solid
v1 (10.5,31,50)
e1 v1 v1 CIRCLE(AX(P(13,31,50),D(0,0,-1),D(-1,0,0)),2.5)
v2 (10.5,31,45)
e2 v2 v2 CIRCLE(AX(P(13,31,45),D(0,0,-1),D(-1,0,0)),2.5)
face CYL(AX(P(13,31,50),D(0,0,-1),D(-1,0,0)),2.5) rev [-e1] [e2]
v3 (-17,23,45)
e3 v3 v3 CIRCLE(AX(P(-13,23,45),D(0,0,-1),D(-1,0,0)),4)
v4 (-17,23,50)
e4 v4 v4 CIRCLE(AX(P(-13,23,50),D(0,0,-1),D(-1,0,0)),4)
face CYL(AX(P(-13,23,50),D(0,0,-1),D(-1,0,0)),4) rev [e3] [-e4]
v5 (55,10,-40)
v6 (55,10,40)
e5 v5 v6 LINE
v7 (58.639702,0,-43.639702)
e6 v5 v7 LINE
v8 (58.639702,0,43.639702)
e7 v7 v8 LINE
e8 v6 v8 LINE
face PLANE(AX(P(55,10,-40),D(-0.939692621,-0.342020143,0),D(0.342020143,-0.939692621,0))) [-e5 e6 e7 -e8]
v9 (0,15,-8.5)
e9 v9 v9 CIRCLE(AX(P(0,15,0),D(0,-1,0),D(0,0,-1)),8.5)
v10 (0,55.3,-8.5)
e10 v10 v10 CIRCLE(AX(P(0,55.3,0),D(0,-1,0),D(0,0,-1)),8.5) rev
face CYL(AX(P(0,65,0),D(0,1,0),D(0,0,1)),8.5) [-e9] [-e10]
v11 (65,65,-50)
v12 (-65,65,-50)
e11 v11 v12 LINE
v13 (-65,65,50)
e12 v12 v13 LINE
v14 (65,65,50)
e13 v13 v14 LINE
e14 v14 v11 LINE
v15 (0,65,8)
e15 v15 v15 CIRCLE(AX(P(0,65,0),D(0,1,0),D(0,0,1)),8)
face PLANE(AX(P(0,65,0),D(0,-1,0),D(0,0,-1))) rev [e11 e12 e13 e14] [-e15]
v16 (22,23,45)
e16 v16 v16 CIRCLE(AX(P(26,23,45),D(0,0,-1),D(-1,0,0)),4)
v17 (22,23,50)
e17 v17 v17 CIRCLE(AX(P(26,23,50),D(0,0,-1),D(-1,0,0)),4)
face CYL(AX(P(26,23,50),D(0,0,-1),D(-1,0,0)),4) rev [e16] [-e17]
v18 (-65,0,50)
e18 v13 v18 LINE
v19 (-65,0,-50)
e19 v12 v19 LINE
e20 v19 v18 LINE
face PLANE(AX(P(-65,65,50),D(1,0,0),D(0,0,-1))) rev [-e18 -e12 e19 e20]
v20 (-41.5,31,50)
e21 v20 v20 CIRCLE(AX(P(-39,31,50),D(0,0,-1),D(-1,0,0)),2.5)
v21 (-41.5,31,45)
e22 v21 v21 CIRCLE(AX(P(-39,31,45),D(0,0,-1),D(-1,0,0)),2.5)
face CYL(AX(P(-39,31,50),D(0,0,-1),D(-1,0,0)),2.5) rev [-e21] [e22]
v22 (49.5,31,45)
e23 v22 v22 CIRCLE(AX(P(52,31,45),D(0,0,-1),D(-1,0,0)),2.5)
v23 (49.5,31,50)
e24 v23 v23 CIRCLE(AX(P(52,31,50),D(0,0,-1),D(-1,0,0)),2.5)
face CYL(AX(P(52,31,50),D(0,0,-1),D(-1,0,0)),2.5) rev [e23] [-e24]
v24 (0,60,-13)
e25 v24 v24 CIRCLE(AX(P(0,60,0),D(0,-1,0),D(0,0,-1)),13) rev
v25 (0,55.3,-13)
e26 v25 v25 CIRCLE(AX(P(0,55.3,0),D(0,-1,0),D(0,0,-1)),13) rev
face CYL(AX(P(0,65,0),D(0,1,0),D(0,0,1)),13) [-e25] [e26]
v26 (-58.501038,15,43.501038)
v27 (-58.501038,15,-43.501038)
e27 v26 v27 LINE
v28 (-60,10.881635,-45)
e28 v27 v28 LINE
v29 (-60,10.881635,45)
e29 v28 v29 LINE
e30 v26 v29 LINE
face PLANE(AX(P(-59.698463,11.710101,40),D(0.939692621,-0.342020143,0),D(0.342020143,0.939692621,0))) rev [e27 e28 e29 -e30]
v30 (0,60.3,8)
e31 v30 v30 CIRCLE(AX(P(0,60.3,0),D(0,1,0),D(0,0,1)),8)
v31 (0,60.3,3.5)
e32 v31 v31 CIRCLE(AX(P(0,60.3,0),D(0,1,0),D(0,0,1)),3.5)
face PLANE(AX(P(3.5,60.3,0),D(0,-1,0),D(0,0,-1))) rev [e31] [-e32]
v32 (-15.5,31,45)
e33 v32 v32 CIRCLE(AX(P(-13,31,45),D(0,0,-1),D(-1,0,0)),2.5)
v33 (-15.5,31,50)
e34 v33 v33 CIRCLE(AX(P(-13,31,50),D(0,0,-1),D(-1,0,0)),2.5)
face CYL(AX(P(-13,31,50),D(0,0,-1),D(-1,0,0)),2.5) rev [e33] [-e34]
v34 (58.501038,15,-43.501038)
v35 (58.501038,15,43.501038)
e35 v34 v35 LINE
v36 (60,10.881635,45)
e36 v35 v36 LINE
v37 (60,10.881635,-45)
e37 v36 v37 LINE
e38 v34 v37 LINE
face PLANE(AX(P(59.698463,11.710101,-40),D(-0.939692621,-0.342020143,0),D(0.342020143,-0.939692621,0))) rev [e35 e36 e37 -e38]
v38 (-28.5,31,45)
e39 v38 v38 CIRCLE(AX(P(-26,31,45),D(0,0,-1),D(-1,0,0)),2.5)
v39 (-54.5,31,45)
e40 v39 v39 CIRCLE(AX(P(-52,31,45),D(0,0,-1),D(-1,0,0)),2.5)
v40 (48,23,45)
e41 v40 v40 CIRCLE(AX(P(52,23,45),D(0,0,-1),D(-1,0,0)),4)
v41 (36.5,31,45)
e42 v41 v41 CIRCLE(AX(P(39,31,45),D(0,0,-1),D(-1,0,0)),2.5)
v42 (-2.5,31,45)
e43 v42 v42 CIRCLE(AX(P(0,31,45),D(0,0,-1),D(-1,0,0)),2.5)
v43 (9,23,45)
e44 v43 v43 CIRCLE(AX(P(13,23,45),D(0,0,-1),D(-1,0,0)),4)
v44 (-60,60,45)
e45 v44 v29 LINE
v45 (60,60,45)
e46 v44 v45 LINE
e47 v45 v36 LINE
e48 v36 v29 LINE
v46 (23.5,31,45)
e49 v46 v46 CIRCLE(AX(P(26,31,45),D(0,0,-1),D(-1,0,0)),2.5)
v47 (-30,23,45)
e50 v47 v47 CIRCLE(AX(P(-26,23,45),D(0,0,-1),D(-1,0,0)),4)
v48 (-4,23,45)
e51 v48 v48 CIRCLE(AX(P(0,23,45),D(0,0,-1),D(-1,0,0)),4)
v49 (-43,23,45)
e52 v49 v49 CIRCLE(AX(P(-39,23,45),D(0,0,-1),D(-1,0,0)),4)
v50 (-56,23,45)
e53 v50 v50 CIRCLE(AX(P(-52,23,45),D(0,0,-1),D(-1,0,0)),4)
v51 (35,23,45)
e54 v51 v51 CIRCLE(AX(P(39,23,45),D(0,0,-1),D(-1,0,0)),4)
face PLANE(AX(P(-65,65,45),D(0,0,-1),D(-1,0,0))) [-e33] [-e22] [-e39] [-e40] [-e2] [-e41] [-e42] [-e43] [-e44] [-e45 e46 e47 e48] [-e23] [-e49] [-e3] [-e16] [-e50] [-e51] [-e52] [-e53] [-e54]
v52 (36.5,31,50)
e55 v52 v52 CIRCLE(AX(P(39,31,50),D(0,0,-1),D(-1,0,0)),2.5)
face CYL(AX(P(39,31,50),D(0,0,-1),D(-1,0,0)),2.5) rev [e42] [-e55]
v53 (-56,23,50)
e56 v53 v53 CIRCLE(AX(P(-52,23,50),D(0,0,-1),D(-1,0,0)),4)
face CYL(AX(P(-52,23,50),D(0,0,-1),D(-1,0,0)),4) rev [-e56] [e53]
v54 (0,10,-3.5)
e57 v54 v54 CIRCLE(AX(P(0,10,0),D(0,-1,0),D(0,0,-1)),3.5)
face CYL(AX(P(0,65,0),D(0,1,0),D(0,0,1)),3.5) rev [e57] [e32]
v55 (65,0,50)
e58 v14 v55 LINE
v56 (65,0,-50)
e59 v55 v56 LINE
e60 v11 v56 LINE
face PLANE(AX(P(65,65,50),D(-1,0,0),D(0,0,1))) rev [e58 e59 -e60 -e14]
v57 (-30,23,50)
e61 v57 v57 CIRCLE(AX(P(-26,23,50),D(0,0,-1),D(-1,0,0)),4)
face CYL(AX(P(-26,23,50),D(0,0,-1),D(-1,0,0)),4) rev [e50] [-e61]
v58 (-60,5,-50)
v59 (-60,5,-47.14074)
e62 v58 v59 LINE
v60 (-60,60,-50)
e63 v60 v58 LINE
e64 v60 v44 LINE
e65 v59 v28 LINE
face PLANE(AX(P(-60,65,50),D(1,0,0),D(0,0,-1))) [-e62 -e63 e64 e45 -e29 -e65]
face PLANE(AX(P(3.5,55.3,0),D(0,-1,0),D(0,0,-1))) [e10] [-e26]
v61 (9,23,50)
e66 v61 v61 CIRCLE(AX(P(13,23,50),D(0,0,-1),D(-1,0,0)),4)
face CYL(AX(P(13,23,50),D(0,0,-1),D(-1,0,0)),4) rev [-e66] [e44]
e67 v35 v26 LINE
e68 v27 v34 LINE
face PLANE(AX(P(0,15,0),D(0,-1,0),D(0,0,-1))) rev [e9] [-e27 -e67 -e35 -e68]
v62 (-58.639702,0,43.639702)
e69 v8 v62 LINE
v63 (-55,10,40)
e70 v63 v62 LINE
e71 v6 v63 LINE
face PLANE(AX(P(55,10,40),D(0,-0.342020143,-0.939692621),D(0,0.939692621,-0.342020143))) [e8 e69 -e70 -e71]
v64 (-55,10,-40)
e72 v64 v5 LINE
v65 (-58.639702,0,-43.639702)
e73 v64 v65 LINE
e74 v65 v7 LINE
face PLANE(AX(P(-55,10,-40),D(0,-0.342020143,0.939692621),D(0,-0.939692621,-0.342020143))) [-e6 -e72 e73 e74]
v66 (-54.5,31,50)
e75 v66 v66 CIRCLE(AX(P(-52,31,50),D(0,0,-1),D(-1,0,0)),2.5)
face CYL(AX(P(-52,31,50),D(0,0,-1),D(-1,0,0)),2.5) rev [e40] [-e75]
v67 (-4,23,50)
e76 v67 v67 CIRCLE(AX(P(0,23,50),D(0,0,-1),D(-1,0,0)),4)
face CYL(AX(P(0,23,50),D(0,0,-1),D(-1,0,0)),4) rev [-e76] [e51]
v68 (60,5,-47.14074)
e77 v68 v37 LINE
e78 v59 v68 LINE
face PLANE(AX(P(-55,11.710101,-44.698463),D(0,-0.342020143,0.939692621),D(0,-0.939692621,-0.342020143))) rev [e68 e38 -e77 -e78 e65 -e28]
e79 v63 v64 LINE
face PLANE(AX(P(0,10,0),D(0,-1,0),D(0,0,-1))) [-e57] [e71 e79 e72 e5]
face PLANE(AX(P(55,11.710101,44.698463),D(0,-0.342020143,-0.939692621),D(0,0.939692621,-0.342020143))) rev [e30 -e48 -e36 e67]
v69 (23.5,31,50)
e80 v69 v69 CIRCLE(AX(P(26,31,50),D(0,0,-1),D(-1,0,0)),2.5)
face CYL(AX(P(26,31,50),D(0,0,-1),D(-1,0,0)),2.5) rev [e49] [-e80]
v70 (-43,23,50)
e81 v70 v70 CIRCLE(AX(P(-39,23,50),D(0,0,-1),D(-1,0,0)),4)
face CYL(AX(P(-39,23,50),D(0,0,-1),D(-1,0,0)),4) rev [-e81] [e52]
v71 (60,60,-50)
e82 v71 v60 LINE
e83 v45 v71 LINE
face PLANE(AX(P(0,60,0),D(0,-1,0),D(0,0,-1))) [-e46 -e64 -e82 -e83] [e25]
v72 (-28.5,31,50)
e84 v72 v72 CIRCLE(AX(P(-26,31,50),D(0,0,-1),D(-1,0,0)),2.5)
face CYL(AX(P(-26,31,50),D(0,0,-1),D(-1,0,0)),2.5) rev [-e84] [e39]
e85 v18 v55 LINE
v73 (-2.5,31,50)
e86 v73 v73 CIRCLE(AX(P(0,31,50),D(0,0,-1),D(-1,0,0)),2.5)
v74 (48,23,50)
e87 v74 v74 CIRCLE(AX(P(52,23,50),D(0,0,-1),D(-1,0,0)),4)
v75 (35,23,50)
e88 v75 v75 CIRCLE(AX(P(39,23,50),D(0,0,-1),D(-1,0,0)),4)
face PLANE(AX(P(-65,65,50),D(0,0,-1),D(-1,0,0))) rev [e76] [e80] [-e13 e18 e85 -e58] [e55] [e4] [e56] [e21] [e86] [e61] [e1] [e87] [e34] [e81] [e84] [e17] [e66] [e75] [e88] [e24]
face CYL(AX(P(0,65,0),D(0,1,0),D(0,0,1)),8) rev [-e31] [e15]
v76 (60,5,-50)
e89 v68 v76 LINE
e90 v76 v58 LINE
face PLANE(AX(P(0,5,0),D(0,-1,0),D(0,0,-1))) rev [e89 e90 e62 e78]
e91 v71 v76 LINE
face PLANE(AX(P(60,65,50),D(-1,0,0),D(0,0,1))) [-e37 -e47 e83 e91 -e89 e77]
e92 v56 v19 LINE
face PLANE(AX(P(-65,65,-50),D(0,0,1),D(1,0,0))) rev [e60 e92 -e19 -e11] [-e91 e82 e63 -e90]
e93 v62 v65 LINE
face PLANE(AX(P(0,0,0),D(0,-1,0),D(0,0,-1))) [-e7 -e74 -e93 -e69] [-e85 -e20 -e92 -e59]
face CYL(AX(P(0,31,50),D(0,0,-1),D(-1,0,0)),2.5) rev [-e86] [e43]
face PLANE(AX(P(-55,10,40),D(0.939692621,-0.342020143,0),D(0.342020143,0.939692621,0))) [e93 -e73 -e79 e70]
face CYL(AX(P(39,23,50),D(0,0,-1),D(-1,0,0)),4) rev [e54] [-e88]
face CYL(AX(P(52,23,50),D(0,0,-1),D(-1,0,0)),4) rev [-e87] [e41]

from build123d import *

# Parameters (mm, degrees)
SKETCH1_W                                        = 130
SKETCH1_H                                        = 100
BOSS_EXTRUDE1_DEPTH                              = 65
SKETCH2_W                                        = 110
SKETCH2_H                                        = 80
CUT_EXTRUDE1_DEPTH                               = 10
CBORE_FOR_M6_HEX_HEAD_MACHINE_SCREW1_D           = 7
CBORE_FOR_M6_HEX_HEAD_MACHINE_SCREW1_CBORE_D     = 16
CBORE_FOR_M6_HEX_HEAD_MACHINE_SCREW1_CBORE_DEPTH = 4.7
SHELL1_START                                     = 15
SHELL1_OUTLINE_W                                 = 120
SHELL1_OUTLINE_H                                 = 95
SHELL1_OUTLINE_R                                 = 13
SHELL1_DEPTH                                     = 45
SHELL1_2_OUTLINE_R                               = 13
SHELL1_2_OUTLINE_R_2                             = 8.5
SHELL1_2_DEPTH                                   = 40.3
SHELL1_START_2                                   = -60
SHELL1_3_DEPTH                                   = 120
SHELL1_START_3                                   = -46
SHELL1_4_DEPTH                                   = 91
SKETCH6_R                                        = 4
SKETCH6_R_2                                      = 2.5
CUT_EXTRUDE2_DEPTH                               = 133.193040664


with BuildPart() as part:
    # Sketch1 → Boss-Extrude1 (new body)
    with BuildSketch(Plane(origin=(0, 0, 0), x_dir=(1, 0, 0), z_dir=(0, 1, 0))):
        Rectangle(SKETCH1_W, SKETCH1_H)
    extrude(amount=BOSS_EXTRUDE1_DEPTH)

    # Sketch2 → Cut-Extrude1 (cut)
    with BuildSketch(Plane.XZ):
        Rectangle(SKETCH2_W, SKETCH2_H)
    extrude(amount=-CUT_EXTRUDE1_DEPTH, mode=Mode.SUBTRACT)

    # Draft1: read off the stored shape, not the designer's step
    # Draft1: loft between two sections, ruled curve by curve
    draft1_from = [
        Edge.make_line((55, 10, -40), (-55, 10, -40)),
        Edge.make_line((-55, 10, -40), (-55, 10, 40)),
        Edge.make_line((-55, 10, 40), (55, 10, 40)),
        Edge.make_line((55, 10, 40), (55, 10, -40)),
    ]
    draft1_to = [
        Edge.make_line((58.639702343, 0, -43.639702343), (-58.639702343, 0, -43.639702343)),
        Edge.make_line((-58.639702343, 0, -43.639702343), (-58.639702343, 0, 43.639702343)),
        Edge.make_line((-58.639702343, 0, 43.639702343), (58.639702343, 0, 43.639702343)),
        Edge.make_line((58.639702343, 0, 43.639702343), (58.639702343, 0, -43.639702343)),
    ]
    draft1 = Solid(Shell([*[Face.make_surface_from_curves(draft1_from[k], draft1_to[k]) for k in range(4)], Face(Wire(draft1_from)), Face(Wire(draft1_to))]))
    add(draft1, mode=Mode.SUBTRACT)

    # CBORE for M6 Hex Head Machine Screw1 (through all)
    with Locations(Plane(origin=(0, 65, 0), x_dir=(1, 0, 0), z_dir=(0, 1, 0))):
        with Locations((0, 0)):
            CounterBoreHole(CBORE_FOR_M6_HEX_HEAD_MACHINE_SCREW1_D / 2, CBORE_FOR_M6_HEX_HEAD_MACHINE_SCREW1_CBORE_D / 2, CBORE_FOR_M6_HEX_HEAD_MACHINE_SCREW1_CBORE_DEPTH)

    # Shell1: read off the stored shape, not the designer's step
    # Shell1 outline → Shell1 (cut)
    with BuildSketch(Plane(origin=(0, 0, 0), x_dir=(1, 0, 0), z_dir=(0, 1, 0)).offset(SHELL1_START)):
        with Locations((0, 2.5)):
            Rectangle(SHELL1_OUTLINE_W, SHELL1_OUTLINE_H)
        Circle(SHELL1_OUTLINE_R, mode=Mode.SUBTRACT)
    extrude(amount=SHELL1_DEPTH, mode=Mode.SUBTRACT)

    # Shell1 2 outline → Shell1 2 (cut)
    with BuildSketch(Plane(origin=(0, 0, 0), x_dir=(1, 0, 0), z_dir=(0, 1, 0)).offset(SHELL1_START)):
        Circle(SHELL1_2_OUTLINE_R)
        Circle(SHELL1_2_OUTLINE_R_2, mode=Mode.SUBTRACT)
    extrude(amount=SHELL1_2_DEPTH, mode=Mode.SUBTRACT)

    # Shell1 3 outline → Shell1 3 (cut)
    with BuildSketch(Plane.YZ.offset(SHELL1_START_2)):
        Polygon((15, -43.501037691), (5, -47.140740034), (5, -50), (15, -50), align=None)
        Polygon((10.881634904, 45), (15, 43.501037691), (15, 45), align=None)
    extrude(amount=SHELL1_3_DEPTH, mode=Mode.SUBTRACT)

    # Shell1 4 outline → Shell1 4 (cut)
    with BuildSketch(Plane.XY.offset(SHELL1_START_3)):
        Polygon((-60, 15), (-60, 10.881634904), (-58.501037691, 15), align=None)
        Polygon((60, 15), (58.501037691, 15), (60, 10.881634904), align=None)
    extrude(amount=SHELL1_4_DEPTH, mode=Mode.SUBTRACT)

    # Sketch6 → Cut-Extrude2 (cut, through all)
    with BuildSketch(Plane(origin=(0, 0, 45), x_dir=(-1, 0, 0), z_dir=(0, 0, -1))):
        with Locations((-52, 23)):
            Circle(SKETCH6_R)
        with Locations((-52, 31)):
            Circle(SKETCH6_R_2)
        with Locations((-39, 31)):
            Circle(SKETCH6_R_2)
        with Locations((-39, 23)):
            Circle(SKETCH6_R)
        with Locations((-26, 31)):
            Circle(SKETCH6_R_2)
        with Locations((-26, 23)):
            Circle(SKETCH6_R)
        with Locations((-13, 31)):
            Circle(SKETCH6_R_2)
        with Locations((-13, 23)):
            Circle(SKETCH6_R)
        with Locations((0, 31)):
            Circle(SKETCH6_R_2)
        with Locations((0, 23)):
            Circle(SKETCH6_R)
        with Locations((13, 31)):
            Circle(SKETCH6_R_2)
        with Locations((13, 23)):
            Circle(SKETCH6_R)
        with Locations((26, 31)):
            Circle(SKETCH6_R_2)
        with Locations((26, 23)):
            Circle(SKETCH6_R)
        with Locations((39, 31)):
            Circle(SKETCH6_R_2)
        with Locations((39, 23)):
            Circle(SKETCH6_R)
        with Locations((52, 31)):
            Circle(SKETCH6_R_2)
        with Locations((52, 23)):
            Circle(SKETCH6_R)
    extrude(amount=-CUT_EXTRUDE2_DEPTH, mode=Mode.SUBTRACT)


solid = part.part
